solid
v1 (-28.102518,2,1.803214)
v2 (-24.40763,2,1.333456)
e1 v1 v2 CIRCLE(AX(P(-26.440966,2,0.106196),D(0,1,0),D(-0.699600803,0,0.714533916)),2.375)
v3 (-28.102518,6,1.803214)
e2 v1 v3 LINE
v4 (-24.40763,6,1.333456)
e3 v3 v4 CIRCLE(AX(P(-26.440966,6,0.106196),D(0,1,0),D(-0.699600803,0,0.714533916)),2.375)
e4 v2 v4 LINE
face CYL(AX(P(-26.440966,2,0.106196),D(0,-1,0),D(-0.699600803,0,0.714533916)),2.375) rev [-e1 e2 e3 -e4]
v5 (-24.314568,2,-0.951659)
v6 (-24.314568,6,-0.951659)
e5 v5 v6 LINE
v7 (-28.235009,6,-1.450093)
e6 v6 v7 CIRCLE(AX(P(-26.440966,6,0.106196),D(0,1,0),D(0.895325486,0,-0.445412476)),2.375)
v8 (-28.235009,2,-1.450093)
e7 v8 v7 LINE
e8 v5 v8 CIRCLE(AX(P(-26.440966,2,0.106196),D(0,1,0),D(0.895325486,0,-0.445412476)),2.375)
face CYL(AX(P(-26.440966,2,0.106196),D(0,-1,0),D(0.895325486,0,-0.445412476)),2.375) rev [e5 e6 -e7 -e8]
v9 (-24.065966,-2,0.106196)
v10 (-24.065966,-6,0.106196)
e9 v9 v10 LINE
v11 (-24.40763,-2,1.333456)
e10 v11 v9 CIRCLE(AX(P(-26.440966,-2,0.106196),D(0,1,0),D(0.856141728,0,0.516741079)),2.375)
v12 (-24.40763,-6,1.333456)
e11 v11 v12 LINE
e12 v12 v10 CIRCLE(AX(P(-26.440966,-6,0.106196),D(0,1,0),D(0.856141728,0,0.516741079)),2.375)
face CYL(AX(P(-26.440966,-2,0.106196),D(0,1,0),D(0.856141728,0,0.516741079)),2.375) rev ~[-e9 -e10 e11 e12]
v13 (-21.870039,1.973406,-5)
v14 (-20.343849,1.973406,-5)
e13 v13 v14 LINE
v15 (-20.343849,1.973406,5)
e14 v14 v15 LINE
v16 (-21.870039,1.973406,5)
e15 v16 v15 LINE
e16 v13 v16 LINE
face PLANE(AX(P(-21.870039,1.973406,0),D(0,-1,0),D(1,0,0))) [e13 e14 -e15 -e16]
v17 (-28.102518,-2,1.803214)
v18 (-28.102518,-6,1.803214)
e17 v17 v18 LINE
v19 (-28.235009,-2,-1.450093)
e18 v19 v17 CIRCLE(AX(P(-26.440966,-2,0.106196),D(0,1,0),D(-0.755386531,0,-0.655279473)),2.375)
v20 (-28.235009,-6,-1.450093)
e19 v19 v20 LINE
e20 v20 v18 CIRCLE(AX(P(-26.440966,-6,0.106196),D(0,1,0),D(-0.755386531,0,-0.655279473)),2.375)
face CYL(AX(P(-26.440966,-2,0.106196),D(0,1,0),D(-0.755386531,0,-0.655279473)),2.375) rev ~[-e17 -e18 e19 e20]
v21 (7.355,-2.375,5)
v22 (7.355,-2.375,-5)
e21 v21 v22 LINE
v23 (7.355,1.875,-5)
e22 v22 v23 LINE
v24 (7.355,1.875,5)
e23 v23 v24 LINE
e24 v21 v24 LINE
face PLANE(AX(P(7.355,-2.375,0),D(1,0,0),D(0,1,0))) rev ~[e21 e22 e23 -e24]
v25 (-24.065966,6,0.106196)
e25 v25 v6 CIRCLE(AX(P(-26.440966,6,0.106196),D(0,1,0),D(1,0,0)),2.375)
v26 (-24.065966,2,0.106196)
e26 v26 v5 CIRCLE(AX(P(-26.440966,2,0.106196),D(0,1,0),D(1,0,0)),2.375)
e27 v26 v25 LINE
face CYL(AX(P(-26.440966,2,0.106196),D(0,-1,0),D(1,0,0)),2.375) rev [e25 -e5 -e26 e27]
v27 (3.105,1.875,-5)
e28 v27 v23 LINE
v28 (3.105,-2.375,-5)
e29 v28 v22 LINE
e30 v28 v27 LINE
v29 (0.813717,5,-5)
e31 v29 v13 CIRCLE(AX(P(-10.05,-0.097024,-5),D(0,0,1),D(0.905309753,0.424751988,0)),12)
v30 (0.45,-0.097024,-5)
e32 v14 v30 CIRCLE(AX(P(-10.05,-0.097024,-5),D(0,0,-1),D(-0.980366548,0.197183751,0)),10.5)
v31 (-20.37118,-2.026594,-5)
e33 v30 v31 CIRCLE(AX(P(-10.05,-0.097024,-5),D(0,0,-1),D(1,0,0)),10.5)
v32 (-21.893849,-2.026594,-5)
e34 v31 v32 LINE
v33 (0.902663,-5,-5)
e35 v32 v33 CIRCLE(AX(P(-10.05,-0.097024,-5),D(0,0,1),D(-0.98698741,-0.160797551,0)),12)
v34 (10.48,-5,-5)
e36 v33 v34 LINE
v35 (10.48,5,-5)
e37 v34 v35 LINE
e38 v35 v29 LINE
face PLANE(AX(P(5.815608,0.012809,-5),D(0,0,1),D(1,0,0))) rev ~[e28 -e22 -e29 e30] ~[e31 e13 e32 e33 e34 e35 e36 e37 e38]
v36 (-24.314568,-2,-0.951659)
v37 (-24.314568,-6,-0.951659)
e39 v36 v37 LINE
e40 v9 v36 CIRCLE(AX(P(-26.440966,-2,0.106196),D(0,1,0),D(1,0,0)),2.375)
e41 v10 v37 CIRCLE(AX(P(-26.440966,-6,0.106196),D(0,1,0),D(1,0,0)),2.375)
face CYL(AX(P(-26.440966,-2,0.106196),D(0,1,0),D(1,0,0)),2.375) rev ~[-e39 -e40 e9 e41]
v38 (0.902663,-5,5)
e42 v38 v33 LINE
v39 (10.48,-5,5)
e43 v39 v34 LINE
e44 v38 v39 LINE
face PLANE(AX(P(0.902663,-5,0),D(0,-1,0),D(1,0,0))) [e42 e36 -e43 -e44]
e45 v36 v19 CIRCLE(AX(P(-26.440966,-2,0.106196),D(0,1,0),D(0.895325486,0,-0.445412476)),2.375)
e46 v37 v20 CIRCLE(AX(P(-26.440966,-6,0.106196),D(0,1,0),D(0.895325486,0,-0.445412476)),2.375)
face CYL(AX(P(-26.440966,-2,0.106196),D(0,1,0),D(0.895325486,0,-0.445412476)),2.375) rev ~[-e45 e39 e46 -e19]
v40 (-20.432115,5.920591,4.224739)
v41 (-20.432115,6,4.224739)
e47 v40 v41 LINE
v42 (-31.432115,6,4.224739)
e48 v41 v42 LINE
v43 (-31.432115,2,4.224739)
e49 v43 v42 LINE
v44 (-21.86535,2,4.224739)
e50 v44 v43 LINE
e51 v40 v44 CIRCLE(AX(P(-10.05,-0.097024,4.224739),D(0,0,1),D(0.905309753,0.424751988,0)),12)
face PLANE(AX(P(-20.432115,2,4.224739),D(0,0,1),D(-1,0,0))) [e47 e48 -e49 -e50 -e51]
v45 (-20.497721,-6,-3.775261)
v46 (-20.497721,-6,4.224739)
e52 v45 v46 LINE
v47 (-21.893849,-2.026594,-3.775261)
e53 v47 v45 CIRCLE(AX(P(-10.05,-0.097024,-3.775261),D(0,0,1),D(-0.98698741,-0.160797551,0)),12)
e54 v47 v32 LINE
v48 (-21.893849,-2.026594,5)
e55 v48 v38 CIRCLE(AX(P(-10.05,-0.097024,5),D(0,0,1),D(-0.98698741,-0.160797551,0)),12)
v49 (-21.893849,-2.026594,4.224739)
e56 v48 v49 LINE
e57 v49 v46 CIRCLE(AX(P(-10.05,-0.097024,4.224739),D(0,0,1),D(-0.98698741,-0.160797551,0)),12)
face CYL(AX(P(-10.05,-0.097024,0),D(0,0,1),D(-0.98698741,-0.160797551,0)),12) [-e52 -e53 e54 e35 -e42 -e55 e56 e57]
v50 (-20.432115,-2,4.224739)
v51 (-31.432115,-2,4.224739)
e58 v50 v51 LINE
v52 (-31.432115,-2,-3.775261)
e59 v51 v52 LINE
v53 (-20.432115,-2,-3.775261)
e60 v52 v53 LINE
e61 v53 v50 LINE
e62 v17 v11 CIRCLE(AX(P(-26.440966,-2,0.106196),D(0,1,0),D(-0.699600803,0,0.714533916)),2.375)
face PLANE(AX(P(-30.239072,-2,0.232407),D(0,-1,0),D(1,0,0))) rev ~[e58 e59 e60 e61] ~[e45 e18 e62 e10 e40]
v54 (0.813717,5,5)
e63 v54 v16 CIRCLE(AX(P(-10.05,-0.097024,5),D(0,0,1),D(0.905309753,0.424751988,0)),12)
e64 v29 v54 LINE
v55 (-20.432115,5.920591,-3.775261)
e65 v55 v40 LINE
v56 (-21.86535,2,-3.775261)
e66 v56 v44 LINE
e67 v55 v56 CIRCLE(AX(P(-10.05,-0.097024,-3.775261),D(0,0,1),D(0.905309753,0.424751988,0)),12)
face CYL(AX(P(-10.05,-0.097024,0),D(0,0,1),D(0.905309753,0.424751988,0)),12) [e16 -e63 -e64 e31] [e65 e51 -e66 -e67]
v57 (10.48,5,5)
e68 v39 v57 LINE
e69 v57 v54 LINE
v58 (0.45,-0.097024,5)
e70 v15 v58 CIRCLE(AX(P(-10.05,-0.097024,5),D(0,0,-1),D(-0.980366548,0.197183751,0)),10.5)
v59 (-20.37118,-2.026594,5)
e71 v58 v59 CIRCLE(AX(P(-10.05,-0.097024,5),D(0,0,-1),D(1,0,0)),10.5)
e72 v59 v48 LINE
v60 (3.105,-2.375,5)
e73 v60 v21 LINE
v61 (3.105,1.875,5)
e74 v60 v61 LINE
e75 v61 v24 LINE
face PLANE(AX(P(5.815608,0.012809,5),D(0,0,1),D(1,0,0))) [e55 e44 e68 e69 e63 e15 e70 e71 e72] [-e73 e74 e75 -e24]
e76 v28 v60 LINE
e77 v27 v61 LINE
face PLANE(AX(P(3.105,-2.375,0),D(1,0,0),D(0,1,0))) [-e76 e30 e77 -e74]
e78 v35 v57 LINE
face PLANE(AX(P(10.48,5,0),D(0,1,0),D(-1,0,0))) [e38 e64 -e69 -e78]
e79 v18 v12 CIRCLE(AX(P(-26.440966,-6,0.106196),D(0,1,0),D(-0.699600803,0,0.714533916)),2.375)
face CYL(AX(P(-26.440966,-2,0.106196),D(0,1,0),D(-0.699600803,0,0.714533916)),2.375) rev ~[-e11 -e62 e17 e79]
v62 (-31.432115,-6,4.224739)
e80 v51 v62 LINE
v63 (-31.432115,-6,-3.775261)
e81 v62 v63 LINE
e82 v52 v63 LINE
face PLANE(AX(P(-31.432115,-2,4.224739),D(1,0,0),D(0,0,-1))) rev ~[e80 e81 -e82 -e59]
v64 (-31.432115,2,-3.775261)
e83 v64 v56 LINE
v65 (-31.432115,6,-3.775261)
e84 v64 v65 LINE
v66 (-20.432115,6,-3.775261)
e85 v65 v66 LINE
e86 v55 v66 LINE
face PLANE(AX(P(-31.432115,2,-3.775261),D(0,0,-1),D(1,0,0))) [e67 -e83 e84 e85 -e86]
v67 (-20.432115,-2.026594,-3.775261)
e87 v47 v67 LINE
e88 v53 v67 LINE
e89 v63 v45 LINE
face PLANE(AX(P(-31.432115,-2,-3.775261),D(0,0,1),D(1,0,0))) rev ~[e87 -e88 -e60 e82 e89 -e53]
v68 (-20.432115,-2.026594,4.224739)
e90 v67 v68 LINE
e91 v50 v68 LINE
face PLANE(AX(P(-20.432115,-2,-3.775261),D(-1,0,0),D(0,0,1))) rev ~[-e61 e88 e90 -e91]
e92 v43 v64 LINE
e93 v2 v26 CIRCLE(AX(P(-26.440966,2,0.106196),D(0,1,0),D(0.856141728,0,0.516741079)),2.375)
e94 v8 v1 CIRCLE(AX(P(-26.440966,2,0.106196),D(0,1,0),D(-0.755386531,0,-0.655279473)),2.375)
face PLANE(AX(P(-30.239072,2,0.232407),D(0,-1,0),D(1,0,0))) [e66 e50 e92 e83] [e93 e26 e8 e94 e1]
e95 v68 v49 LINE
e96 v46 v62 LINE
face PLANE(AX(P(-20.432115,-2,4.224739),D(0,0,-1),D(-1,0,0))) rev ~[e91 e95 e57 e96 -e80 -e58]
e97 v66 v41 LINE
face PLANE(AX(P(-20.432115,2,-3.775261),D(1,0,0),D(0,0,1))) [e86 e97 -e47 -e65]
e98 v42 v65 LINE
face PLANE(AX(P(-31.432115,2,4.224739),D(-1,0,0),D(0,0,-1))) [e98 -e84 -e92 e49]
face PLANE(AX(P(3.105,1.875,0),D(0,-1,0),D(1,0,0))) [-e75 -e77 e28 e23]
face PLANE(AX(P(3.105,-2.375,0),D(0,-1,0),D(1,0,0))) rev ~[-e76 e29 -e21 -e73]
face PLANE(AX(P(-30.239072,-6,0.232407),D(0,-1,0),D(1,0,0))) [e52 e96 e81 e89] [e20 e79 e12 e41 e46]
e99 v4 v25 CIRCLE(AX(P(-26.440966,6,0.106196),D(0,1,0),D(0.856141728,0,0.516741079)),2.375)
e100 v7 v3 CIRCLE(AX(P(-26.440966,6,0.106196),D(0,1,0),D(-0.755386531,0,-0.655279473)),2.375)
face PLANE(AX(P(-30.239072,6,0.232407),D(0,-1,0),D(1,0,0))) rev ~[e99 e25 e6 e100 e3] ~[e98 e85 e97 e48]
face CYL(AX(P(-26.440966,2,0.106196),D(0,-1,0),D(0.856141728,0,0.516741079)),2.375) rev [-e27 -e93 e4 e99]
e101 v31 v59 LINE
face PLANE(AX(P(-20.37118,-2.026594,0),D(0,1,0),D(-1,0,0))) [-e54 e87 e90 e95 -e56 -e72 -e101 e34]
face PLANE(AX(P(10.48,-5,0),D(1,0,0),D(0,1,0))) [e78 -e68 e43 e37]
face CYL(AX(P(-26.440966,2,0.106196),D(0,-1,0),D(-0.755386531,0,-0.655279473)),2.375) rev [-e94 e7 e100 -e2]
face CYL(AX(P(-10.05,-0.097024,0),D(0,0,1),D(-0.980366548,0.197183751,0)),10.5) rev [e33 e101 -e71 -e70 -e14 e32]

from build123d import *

# Parameters (mm, degrees)
F0_W     = 4.25
F0_H     = 4.25
F1_DEPTH = 5
F3_START = 2
F3_DEPTH = 4
F4_START = -2
F4_DEPTH = 4


# Not quite as in the source:
# - a feature names something its author has since deleted; it is built from what else it names


with BuildPart() as f1:
    # F0 (on Top) → F1 (new body, symmetric)
    with BuildSketch(Plane.XY):
        with BuildLine():
            Line((10.48, -5), (10.48, 5))
            Line((10.48, 5), (0.8137170322, 5))
            ThreePointArc((0.8137170322, 5), (1.6624848855, 2.5140482951), (1.95, -0.0970238614))
            ThreePointArc((1.95, -0.0970238614), (1.6852450978, -2.6038191253), (0.9026629175, -5))
            Line((0.9026629175, -5), (10.48, -5))
        make_face()
        with Locations((5.23, -0.25)):
            Rectangle(F0_W, F0_H, mode=Mode.SUBTRACT)
        with BuildLine():
            ThreePointArc((1.95, -0.0970238614), (1.6624848855, 2.5140482951), (0.8137170322, 5))
            Line((0.8137170322, 5), (0.48, 5))
            Line((0.48, 5), (0.48, -5))
            Line((0.48, -5), (0.9026629175, -5))
            ThreePointArc((0.9026629175, -5), (1.6852450978, -2.6038191253), (1.95, -0.0970238614))
        make_face()
        with BuildLine():
            Line((0.48, 5), (0.8137170322, 5))
            ThreePointArc((0.8137170322, 5), (-11.6370433083, 11.7975670747), (-21.8700390085, 1.9734055232))
            Line((-21.8700390085, 1.9734055232), (-20.3438487537, 1.9734055232))
            ThreePointArc((-20.3438487537, 1.9734055232), (-9.0096663788, 10.3513112192), (0.45, -0.0970238614))
            ThreePointArc((0.45, -0.0970238614), (-9.0810805838, -10.5522232935), (-20.3711800314, -2.0265944768))
            Line((-20.3711800314, -2.0265944768), (-21.89384892, -2.0265944768))
            ThreePointArc((-21.89384892, -2.0265944768), (-11.6020432417, -11.9962323131), (0.9026629175, -5))
            Line((0.9026629175, -5), (0.48, -5))
            Line((0.48, -5), (0.48, 5))
        make_face()
    extrude(amount=F1_DEPTH, both=True)

    # F2 (on Front) → F3 (join)
    with BuildSketch(Plane.XZ.offset(F3_START)):
        with BuildLine():
            Line((-28.1025181167, 1.8032137252), (-31.4321152449, 4.2247389093))
            Line((-31.4321152449, 4.2247389093), (-31.4321152449, -3.7752610907))
            Line((-31.4321152449, -3.7752610907), (-28.2350092218, -1.4500930739))
            ThreePointArc((-28.2350092218, -1.4500930739), (-28.8139991516, 0.2028375775), (-28.1025181167, 1.8032137252))
        make_face()
        with BuildLine():
            Line((-24.4076296068, 1.333455737), (-20.4321152449, 4.2247389093))
            Line((-20.4321152449, 4.2247389093), (-31.4321152449, 4.2247389093))
            Line((-31.4321152449, 4.2247389093), (-28.1025181167, 1.8032137252))
            ThreePointArc((-28.1025181167, 1.8032137252), (-26.1414263845, 2.4622306695), (-24.4076296068, 1.333455737))
        make_face()
        with BuildLine():
            Line((-20.4321152449, -3.7752610907), (-20.4321152449, 0.2247389093))
            Line((-20.4321152449, 0.2247389093), (-20.4321152449, 4.2247389093))
            Line((-20.4321152449, 4.2247389093), (-24.4076296068, 1.333455737))
            ThreePointArc((-24.4076296068, 1.333455737), (-24.1529758873, 0.7431613605), (-24.0659662098, 0.1061956755))
            ThreePointArc((-24.0659662098, 0.1061956755), (-24.128951902, -0.4371410894), (-24.3145681805, -0.9516589557))
            Line((-24.3145681805, -0.9516589557), (-20.4321152449, -3.7752610907))
        make_face()
        with BuildLine():
            Line((-31.4321152449, -3.7752610907), (-20.4321152449, -3.7752610907))
            Line((-20.4321152449, -3.7752610907), (-24.3145681805, -0.9516589557))
            ThreePointArc((-24.3145681805, -0.9516589557), (-26.1414263845, -2.2498393185), (-28.2350092218, -1.4500930739))
            Line((-28.2350092218, -1.4500930739), (-31.4321152449, -3.7752610907))
        make_face()
    extrude(amount=F3_DEPTH)

    # F2 (on Front) → F4 (join)
    with BuildSketch(Plane.XZ.offset(F4_START)):
        with BuildLine():
            Line((-28.1025181167, 1.8032137252), (-31.4321152449, 4.2247389093))
            Line((-31.4321152449, 4.2247389093), (-31.4321152449, -3.7752610907))
            Line((-31.4321152449, -3.7752610907), (-28.2350092218, -1.4500930739))
            ThreePointArc((-28.2350092218, -1.4500930739), (-28.8139991516, 0.2028375775), (-28.1025181167, 1.8032137252))
        make_face()
        with BuildLine():
            Line((-24.4076296068, 1.333455737), (-20.4321152449, 4.2247389093))
            Line((-20.4321152449, 4.2247389093), (-31.4321152449, 4.2247389093))
            Line((-31.4321152449, 4.2247389093), (-28.1025181167, 1.8032137252))
            ThreePointArc((-28.1025181167, 1.8032137252), (-26.1414263845, 2.4622306695), (-24.4076296068, 1.333455737))
        make_face()
        with BuildLine():
            Line((-20.4321152449, -3.7752610907), (-20.4321152449, 0.2247389093))
            Line((-20.4321152449, 0.2247389093), (-20.4321152449, 4.2247389093))
            Line((-20.4321152449, 4.2247389093), (-24.4076296068, 1.333455737))
            ThreePointArc((-24.4076296068, 1.333455737), (-24.1529758873, 0.7431613605), (-24.0659662098, 0.1061956755))
            ThreePointArc((-24.0659662098, 0.1061956755), (-24.128951902, -0.4371410894), (-24.3145681805, -0.9516589557))
            Line((-24.3145681805, -0.9516589557), (-20.4321152449, -3.7752610907))
        make_face()
        with BuildLine():
            Line((-31.4321152449, -3.7752610907), (-20.4321152449, -3.7752610907))
            Line((-20.4321152449, -3.7752610907), (-24.3145681805, -0.9516589557))
            ThreePointArc((-24.3145681805, -0.9516589557), (-26.1414263845, -2.2498393185), (-28.2350092218, -1.4500930739))
            Line((-28.2350092218, -1.4500930739), (-31.4321152449, -3.7752610907))
        make_face()
    extrude(amount=-F4_DEPTH)


solid = f1.part
